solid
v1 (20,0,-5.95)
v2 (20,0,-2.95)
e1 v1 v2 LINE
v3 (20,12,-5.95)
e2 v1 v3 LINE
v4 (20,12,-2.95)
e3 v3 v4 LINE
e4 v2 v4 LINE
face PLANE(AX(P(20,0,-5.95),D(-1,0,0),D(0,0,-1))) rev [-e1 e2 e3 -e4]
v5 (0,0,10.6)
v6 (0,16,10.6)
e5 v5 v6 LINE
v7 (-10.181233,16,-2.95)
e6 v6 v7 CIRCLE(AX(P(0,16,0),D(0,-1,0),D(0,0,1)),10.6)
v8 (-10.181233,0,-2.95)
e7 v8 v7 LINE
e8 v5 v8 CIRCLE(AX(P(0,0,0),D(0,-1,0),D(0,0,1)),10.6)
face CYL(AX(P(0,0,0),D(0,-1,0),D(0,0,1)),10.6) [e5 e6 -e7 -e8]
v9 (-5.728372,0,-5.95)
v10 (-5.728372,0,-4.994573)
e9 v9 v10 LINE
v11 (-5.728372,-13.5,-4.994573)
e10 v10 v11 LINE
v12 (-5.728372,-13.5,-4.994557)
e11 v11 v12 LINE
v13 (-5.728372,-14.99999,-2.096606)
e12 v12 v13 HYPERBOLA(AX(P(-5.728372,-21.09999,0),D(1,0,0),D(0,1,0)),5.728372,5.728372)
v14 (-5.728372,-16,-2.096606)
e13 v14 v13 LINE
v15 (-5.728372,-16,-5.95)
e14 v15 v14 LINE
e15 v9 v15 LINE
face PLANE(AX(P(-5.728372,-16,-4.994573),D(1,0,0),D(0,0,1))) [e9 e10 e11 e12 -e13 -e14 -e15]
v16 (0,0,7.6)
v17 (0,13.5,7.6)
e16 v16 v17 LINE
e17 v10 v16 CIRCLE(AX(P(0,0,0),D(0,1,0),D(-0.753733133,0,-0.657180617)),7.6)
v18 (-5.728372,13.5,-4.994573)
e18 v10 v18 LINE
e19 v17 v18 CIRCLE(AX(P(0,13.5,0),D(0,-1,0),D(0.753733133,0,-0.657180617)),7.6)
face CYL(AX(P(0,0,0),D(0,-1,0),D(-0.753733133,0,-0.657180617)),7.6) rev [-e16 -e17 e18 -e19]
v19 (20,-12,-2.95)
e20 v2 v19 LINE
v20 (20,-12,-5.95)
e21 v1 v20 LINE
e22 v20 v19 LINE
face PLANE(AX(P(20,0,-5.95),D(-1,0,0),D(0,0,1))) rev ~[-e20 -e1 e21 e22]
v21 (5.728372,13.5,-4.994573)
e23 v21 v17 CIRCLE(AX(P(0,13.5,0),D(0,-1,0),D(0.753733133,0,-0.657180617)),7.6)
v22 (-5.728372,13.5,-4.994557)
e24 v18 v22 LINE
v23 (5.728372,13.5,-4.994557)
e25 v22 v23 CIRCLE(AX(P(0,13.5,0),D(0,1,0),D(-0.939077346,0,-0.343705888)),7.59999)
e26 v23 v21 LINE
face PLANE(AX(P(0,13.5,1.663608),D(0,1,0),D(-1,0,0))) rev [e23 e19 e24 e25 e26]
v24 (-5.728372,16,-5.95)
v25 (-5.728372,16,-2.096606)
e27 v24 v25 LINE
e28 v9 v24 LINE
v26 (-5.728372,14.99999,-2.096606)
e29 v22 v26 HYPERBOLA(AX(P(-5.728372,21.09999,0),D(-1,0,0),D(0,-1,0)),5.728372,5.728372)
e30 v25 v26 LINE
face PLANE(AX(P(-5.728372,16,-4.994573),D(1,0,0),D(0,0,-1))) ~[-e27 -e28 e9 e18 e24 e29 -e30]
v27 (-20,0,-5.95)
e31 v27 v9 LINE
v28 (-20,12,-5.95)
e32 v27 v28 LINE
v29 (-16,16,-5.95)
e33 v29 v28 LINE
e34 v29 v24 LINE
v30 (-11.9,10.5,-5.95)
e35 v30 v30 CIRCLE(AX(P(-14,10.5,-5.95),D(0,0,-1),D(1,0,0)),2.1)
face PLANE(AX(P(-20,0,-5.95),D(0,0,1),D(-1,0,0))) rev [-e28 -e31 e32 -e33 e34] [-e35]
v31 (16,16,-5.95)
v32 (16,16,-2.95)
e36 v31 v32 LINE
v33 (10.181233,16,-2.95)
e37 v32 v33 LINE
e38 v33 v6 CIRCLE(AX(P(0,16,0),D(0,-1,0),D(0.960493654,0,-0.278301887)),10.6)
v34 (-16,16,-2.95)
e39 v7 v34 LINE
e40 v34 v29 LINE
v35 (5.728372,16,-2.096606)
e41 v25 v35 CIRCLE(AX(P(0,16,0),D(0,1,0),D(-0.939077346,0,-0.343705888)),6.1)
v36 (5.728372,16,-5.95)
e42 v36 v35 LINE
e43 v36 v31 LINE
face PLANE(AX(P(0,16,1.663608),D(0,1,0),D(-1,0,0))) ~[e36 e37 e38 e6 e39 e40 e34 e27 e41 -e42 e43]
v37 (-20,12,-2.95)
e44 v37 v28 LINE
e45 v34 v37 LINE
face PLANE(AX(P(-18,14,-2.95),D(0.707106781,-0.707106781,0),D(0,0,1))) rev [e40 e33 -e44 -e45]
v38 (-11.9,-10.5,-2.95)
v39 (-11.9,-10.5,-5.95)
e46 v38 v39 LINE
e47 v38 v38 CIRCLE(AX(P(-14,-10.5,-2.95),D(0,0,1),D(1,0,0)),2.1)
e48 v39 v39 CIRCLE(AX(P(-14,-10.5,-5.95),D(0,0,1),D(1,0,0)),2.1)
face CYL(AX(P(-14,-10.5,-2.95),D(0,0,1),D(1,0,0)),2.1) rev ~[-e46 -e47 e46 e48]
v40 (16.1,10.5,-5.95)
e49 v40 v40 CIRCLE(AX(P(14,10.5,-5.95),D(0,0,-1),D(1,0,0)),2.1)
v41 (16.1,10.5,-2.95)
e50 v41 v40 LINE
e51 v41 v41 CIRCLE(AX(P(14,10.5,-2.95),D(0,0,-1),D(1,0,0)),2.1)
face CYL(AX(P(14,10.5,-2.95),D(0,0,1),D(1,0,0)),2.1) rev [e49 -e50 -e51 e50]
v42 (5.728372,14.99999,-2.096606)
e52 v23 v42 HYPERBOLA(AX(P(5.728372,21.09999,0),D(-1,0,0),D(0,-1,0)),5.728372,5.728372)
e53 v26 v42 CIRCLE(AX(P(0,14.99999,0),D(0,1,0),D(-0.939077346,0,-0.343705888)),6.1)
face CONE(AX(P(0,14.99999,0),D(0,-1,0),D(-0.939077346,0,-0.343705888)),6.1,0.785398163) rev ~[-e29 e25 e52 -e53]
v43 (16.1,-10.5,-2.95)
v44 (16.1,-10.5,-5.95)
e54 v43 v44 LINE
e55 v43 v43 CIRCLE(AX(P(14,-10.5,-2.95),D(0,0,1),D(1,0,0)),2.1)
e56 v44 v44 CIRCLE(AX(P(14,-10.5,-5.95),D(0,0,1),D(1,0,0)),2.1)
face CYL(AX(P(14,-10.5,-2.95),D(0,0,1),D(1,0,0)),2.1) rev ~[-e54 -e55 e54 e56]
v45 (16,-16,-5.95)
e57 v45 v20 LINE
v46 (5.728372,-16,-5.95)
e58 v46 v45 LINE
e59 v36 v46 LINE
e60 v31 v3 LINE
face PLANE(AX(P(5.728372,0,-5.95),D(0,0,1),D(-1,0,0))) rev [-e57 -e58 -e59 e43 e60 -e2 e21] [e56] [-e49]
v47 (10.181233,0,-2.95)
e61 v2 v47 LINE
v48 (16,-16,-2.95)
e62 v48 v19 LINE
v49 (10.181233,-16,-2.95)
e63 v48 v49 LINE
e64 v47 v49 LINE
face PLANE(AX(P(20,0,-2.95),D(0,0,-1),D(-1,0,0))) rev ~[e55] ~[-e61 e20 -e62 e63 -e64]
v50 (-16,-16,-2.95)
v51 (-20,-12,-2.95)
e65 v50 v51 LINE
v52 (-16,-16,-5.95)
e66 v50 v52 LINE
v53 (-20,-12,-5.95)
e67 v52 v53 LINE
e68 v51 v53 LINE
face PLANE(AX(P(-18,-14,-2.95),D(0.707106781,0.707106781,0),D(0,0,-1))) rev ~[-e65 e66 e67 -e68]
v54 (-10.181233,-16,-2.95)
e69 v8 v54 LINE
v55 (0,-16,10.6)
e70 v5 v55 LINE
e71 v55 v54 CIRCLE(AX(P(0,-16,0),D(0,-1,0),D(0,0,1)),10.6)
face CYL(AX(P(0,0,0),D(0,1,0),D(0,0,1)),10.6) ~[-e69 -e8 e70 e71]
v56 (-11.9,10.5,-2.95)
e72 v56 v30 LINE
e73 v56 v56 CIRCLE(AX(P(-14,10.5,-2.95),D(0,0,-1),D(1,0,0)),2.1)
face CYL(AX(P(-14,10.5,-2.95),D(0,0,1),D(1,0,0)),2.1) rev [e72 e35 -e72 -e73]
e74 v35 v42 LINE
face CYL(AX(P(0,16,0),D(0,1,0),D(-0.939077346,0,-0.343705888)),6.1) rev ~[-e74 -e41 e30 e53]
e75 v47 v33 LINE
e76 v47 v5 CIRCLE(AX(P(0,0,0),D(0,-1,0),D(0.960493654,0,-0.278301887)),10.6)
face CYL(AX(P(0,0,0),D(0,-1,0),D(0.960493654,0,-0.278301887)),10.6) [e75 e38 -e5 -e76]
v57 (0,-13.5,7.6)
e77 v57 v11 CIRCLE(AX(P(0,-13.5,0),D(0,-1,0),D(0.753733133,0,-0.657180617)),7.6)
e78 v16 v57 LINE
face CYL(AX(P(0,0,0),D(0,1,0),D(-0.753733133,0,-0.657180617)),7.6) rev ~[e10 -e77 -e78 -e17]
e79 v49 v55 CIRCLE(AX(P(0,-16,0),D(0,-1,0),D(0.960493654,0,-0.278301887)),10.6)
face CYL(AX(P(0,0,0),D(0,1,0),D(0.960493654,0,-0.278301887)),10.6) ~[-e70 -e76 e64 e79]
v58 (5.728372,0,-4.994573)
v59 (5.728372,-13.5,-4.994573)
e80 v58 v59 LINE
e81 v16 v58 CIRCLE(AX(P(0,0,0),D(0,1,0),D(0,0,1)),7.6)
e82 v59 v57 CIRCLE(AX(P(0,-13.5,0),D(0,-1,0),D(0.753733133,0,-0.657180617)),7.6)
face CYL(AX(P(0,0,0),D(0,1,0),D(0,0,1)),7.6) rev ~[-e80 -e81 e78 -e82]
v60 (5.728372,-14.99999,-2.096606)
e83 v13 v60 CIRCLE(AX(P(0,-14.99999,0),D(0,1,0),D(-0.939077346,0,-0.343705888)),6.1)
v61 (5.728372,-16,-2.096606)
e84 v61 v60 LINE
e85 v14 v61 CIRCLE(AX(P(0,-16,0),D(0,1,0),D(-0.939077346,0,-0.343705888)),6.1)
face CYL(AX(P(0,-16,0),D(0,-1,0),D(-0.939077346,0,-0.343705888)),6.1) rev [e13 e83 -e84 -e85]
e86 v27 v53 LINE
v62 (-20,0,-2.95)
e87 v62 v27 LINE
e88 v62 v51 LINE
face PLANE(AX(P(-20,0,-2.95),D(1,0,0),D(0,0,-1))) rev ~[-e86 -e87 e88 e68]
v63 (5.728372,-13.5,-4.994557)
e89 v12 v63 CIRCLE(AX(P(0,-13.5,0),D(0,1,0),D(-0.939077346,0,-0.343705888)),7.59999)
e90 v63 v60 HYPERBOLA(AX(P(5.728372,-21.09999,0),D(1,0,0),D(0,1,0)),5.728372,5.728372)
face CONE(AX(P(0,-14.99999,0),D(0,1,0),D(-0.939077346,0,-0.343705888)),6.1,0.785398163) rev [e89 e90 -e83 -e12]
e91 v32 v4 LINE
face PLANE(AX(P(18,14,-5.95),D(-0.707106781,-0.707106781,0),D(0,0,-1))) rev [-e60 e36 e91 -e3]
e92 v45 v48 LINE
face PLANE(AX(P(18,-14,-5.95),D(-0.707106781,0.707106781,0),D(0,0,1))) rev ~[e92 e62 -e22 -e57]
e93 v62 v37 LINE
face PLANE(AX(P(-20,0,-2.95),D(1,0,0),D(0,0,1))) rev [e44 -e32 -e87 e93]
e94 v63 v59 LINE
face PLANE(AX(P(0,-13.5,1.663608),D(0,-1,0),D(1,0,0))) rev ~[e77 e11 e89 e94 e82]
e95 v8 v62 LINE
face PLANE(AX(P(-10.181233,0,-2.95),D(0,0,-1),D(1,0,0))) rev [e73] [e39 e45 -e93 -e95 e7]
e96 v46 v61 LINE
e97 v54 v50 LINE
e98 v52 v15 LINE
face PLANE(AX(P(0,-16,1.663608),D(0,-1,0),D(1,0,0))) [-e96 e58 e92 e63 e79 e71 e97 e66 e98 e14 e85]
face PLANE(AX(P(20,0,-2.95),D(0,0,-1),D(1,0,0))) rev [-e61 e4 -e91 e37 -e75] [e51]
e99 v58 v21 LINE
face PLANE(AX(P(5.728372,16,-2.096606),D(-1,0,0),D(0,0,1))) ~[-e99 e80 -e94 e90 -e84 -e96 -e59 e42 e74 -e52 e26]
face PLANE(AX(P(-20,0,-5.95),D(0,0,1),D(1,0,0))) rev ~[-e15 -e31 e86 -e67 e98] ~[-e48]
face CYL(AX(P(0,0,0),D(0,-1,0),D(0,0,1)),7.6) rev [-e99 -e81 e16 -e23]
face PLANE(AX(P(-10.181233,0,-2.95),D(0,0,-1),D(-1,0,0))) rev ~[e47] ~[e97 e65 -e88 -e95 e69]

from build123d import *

# Parameters (mm, degrees)
F1_DEPTH = 16
F2_R     = 2.1
F3_DEPTH = 3
F4_SIZE  = 4
F6_DEPTH = 2.5
F7_SIZE  = 1.49999


# Not quite as in the source:
# - a fillet or chamfer is up to 0.001 mm smaller than in the source, because OpenCascade refuses the exact size


with BuildPart() as f1:
    # F0 (on Front) → F1 (new body)
    with BuildSketch(Plane.XZ):
        with BuildLine():
            ThreePointArc((-5.7283718128, -4.9945726919), (-6.9180471398, 3.1465256666), (0, 7.6))
            Line((0, 7.6), (0, 10.6))
            ThreePointArc((0, 10.6), (-8.4743731332, 6.367495583), (-10.1812327348, -2.95))
            Line((-10.1812327348, -2.95), (-20, -2.95))
            Line((-20, -2.95), (-20, -5.95))
            Line((-20, -5.95), (-5.7283718128, -5.95))
            Line((-5.7283718128, -5.95), (-5.7283718128, -4.9945726919))
        make_face()
        with BuildLine():
            Line((0, 10.6), (0, 7.6))
            ThreePointArc((0, 7.6), (6.9180471398, 3.1465256666), (5.7283718128, -4.9945726919))
            Line((5.7283718128, -4.9945726919), (5.7283718128, -5.95))
            Line((5.7283718128, -5.95), (20, -5.95))
            Line((20, -5.95), (20, -2.95))
            Line((20, -2.95), (10.1812327348, -2.95))
            ThreePointArc((10.1812327348, -2.95), (8.4743731332, 6.367495583), (0, 10.6))
        make_face()
    extrude(amount=F1_DEPTH)

    # F2 (on face) → F3 (cut, through all)
    with BuildSketch(Plane.XY.offset(-2.95)):
        with Locations((-14, -10.5)):
            Circle(F2_R)
        with Locations((14, -10.5)):
            Circle(F2_R)
    extrude(amount=-F3_DEPTH, mode=Mode.SUBTRACT)

    # F4
    f4_edges = [f1.edges().sort_by_distance(p)[0] for p in [
        (-20, -16, -4.45),
        (20, -16, -4.45),
    ]]
    chamfer(f4_edges, length=F4_SIZE)

    # F5 (on face) → F6 (join)
    with BuildSketch(Plane.XZ.offset(16)):
        with BuildLine():
            Line((5.7283718128, -2.0966059178), (5.7283718128, -4.9945726919))
            ThreePointArc((5.7283718128, -4.9945726919), (0, 7.6), (-5.7283718128, -4.9945726919))
            Line((-5.7283718128, -4.9945726919), (-5.7283718128, -2.0966059178))
            ThreePointArc((-5.7283718128, -2.0966059178), (0, 6.1), (5.7283718128, -2.0966059178))
        make_face()
    extrude(amount=-F6_DEPTH)

    # F7 (size 1.5 in the source; OpenCascade refuses exactly that, so slightly less here)
    f7_edges = [f1.edges().sort_by_distance(p)[0] for p in [
        (0, -13.5, 6.1),
    ]]
    chamfer(f7_edges, length=F7_SIZE)

    # F8: F1 across plane


with BuildPart() as f1_1:
    add(f1.part)
    add(f1.part.mirror(Plane.XZ))


solid = f1_1.part
